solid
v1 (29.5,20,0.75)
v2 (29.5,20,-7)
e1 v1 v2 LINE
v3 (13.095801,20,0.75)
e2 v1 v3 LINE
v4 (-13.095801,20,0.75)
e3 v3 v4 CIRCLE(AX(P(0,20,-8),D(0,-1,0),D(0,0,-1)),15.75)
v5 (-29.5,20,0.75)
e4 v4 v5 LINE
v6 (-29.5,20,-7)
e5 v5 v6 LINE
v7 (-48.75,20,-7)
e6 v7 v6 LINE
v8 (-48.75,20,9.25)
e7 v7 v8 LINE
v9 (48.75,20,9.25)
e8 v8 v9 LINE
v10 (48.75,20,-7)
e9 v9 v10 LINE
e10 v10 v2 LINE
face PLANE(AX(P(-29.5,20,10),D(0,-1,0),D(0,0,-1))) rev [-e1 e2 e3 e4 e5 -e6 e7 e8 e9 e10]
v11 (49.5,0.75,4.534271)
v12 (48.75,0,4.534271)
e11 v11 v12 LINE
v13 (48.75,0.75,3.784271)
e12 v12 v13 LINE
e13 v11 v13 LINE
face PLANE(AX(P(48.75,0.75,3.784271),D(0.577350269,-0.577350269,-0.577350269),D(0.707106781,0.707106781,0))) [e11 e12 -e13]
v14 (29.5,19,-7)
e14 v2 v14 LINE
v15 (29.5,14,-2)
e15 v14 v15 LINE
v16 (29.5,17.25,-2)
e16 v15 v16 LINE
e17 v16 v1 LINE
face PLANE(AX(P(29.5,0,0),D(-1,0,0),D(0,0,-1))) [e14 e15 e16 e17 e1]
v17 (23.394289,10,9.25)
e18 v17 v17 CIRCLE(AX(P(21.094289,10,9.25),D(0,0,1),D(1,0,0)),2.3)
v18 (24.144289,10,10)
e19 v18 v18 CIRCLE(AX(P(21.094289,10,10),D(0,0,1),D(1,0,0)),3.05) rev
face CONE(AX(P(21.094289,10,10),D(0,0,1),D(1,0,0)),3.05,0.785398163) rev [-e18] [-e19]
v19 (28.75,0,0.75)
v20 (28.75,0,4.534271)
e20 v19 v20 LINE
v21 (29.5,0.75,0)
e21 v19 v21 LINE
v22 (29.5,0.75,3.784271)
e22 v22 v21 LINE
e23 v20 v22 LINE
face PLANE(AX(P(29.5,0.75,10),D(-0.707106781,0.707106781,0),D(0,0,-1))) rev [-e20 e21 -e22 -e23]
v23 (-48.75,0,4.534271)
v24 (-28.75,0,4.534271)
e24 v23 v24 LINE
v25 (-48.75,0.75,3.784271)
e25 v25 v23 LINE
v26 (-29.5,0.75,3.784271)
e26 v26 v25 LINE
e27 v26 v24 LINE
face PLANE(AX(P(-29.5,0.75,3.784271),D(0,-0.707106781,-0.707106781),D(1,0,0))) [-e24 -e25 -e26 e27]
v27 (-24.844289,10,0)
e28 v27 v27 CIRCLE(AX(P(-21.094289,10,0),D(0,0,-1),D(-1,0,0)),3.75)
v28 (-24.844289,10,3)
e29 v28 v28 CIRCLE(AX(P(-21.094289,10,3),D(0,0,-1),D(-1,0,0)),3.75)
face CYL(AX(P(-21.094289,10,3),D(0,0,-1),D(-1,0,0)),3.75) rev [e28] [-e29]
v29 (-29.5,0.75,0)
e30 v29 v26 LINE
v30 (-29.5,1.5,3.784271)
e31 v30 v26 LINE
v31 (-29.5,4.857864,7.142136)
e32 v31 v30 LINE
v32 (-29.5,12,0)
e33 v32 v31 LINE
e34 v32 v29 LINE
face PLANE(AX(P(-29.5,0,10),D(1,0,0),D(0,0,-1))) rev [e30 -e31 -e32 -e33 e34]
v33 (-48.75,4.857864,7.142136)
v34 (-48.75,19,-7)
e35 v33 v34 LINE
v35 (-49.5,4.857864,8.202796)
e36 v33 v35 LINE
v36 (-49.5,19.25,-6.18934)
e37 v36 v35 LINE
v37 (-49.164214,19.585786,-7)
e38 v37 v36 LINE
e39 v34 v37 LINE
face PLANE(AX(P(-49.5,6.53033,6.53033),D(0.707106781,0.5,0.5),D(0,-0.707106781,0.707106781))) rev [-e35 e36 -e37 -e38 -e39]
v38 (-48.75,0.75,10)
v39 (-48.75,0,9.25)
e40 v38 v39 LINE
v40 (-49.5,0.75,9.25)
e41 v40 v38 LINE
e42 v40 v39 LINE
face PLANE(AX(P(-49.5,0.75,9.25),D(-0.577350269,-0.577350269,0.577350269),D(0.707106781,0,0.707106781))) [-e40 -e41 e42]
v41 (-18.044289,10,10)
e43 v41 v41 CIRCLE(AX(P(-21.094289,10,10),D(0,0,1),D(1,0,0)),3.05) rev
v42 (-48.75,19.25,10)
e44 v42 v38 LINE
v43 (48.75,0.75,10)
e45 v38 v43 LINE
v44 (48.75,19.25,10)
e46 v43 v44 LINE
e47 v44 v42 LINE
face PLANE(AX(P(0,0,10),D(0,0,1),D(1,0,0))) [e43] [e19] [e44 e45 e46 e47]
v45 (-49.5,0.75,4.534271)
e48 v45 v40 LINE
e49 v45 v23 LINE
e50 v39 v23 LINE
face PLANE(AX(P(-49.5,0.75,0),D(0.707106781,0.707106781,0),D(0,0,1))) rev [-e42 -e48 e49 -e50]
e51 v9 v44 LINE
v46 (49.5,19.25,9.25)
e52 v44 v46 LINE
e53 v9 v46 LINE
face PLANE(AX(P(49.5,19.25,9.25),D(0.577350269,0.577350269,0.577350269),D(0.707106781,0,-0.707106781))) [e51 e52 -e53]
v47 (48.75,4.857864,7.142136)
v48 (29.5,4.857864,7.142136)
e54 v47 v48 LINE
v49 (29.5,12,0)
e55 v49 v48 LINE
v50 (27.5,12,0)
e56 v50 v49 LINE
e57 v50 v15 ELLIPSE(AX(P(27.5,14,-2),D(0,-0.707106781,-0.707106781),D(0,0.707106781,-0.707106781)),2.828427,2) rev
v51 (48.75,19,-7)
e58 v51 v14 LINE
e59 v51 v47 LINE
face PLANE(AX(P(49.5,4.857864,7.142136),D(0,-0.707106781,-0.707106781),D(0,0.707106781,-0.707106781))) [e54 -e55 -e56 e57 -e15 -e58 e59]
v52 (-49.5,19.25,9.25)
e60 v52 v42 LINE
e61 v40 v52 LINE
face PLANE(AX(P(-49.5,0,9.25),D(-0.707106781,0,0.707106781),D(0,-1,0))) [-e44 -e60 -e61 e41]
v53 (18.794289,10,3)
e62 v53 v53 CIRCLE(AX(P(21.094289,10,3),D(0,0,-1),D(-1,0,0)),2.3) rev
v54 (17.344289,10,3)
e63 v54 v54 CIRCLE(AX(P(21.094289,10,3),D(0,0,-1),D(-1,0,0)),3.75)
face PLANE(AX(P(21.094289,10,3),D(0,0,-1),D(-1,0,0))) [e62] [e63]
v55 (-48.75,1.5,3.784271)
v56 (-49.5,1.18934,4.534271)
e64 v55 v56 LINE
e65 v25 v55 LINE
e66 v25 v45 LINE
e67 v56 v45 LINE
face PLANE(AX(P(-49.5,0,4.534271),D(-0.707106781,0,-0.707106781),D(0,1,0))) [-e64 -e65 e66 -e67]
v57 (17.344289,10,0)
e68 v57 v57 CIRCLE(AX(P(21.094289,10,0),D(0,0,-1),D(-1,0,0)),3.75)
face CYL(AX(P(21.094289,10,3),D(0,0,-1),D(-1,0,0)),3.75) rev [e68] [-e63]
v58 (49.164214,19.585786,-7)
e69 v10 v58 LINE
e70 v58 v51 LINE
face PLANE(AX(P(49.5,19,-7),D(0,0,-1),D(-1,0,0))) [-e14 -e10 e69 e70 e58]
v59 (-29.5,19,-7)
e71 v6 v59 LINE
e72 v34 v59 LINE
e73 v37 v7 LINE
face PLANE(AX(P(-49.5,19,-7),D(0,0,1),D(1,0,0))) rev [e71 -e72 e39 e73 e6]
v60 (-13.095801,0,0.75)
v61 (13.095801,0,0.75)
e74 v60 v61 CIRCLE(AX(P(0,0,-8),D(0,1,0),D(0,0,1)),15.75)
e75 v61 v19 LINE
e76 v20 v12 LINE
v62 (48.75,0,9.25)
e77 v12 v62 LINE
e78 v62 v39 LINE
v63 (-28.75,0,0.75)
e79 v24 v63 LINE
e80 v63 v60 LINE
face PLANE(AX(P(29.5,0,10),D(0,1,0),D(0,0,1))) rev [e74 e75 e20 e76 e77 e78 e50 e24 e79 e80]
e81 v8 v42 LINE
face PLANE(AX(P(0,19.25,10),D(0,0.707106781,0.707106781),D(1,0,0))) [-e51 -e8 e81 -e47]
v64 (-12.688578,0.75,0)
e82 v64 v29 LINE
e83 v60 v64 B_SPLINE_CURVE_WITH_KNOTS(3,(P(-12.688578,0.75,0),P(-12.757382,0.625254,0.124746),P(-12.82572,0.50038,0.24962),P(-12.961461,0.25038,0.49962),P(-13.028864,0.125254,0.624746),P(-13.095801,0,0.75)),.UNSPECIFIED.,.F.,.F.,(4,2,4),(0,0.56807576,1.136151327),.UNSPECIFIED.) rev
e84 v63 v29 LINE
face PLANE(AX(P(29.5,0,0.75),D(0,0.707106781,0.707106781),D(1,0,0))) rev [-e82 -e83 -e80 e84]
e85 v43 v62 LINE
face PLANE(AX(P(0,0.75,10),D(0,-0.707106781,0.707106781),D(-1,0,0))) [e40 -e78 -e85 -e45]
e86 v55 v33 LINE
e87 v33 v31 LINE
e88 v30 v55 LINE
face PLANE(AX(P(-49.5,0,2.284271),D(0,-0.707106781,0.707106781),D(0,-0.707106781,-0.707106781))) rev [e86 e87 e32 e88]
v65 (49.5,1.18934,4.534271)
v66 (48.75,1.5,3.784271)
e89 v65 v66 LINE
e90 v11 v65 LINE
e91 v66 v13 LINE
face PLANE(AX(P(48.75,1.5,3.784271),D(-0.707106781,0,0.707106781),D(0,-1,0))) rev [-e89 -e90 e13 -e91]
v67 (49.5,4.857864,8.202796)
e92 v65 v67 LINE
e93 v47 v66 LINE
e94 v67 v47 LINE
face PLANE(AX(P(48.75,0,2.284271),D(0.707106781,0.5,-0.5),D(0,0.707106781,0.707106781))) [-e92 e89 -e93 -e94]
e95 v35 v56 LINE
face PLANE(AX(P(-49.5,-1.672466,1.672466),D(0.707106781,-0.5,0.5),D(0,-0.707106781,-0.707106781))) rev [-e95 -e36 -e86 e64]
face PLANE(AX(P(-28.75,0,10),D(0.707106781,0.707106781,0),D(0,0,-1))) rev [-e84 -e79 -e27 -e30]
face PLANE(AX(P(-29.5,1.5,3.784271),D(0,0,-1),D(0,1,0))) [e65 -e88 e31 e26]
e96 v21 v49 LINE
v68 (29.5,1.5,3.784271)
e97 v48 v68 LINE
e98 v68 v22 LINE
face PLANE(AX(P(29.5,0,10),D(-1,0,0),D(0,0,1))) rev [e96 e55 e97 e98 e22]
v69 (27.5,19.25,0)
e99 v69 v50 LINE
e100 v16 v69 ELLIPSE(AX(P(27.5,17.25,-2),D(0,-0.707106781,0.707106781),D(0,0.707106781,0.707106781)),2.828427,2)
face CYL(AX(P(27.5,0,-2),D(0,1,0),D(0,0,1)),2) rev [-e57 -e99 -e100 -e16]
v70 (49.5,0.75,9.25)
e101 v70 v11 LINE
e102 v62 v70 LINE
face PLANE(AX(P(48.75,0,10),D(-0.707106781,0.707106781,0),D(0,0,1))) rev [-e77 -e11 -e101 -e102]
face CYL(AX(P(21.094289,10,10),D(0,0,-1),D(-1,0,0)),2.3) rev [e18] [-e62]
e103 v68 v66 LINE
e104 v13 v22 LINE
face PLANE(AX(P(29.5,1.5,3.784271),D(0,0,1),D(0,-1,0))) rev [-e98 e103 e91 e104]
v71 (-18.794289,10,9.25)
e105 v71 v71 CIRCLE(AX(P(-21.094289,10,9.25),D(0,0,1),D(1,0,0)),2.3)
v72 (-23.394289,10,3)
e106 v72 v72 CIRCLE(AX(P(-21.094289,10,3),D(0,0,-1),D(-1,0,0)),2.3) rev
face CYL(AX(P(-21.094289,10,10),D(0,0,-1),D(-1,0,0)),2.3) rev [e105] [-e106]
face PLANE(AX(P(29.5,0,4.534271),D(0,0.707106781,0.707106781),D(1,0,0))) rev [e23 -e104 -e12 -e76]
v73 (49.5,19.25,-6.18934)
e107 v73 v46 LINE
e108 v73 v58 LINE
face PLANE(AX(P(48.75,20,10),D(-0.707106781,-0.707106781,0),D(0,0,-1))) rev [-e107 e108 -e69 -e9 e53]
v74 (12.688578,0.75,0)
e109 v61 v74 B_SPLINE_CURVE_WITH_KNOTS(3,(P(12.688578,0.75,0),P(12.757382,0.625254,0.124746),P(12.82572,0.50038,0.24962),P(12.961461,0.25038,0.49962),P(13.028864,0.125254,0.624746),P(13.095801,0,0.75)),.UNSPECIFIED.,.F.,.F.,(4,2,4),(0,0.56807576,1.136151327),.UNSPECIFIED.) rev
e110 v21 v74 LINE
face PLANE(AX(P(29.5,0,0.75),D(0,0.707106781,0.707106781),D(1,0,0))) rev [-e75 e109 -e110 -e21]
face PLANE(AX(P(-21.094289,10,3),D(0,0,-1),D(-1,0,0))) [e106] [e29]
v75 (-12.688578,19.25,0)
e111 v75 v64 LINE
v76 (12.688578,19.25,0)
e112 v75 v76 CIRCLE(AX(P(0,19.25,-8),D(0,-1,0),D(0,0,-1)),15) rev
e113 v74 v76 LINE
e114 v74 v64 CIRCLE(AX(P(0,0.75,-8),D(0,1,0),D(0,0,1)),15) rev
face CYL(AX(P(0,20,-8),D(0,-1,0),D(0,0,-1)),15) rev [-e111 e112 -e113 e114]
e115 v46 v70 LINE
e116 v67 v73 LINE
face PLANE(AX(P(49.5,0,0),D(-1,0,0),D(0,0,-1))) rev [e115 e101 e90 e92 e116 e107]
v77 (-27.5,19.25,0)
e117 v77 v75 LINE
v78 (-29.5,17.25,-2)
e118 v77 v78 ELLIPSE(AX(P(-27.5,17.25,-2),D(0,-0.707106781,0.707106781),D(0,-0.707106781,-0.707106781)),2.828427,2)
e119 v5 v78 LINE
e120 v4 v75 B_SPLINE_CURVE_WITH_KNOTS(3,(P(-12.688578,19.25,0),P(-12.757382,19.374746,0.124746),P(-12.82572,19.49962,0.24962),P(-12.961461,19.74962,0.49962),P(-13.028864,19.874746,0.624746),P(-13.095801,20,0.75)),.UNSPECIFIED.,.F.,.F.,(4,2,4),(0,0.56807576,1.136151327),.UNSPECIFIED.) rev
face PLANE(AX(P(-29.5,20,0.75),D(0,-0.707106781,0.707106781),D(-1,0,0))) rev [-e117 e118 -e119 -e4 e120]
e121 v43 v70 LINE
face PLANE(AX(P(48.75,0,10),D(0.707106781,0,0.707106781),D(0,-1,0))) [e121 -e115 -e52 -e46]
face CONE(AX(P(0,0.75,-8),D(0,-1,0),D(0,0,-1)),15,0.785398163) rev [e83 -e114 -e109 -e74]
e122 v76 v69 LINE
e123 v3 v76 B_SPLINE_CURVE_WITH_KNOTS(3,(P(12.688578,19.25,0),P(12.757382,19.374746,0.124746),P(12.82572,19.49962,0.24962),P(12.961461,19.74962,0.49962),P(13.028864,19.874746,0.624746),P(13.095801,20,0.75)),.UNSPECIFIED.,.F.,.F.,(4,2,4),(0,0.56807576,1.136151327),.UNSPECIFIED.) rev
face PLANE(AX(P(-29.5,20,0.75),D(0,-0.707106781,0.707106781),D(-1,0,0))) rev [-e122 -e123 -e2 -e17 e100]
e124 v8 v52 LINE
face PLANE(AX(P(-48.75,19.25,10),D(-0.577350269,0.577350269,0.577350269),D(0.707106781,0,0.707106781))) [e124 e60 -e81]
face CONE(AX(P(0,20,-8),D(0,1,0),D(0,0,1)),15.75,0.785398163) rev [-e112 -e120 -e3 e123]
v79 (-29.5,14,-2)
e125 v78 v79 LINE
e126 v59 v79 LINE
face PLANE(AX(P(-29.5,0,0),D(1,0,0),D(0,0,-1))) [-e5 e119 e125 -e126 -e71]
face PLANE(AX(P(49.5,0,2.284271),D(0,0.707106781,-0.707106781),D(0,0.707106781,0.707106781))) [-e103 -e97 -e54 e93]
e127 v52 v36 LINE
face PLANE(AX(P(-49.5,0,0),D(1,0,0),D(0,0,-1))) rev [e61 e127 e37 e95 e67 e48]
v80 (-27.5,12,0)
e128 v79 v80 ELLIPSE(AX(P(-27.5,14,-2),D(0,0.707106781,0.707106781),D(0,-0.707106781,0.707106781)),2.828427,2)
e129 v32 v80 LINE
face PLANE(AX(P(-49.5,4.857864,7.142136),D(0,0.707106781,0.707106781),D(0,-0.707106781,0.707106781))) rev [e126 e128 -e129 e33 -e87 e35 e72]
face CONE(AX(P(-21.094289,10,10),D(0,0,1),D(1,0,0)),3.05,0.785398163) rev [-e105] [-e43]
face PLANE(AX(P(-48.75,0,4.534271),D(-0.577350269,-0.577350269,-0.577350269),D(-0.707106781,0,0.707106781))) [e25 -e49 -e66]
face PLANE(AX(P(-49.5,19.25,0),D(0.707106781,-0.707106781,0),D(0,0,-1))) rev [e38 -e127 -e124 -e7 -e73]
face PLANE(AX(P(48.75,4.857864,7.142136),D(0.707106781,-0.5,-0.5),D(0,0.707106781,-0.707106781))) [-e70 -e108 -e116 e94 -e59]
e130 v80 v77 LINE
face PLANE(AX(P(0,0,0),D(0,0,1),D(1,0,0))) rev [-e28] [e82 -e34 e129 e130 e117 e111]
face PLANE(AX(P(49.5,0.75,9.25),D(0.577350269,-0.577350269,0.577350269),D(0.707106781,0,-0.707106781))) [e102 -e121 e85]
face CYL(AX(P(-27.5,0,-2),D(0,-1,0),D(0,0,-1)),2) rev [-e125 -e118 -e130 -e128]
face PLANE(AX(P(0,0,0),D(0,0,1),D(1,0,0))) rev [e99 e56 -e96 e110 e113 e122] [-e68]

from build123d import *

# Parameters (mm, degrees)
SKIZZE1_W                       = 59
SKIZZE1_H                       = 20
AUFSATZ_LINEAR_AUSTRAGEN1_DEPTH = 10
AUFSATZ_LINEAR_AUSTRAGEN2_DEPTH = 20
SKIZZE3_R                       = 15
SCHNITT_LINEAR_AUSTRAGEN1_DEPTH = 20
SKIZZE4_R                       = 2.3
SCHNITT_LINEAR_AUSTRAGEN2_DEPTH = 10
SKIZZE5_R                       = 3.75
SCHNITT_LINEAR_AUSTRAGEN3_DEPTH = 3
SCHNITT_LINEAR_AUSTRAGEN4_DEPTH = 20
VERRUNDUNG1_R                   = 2


with BuildPart() as part:
    # Skizze1 → Aufsatz-Linear austragen1 (new body)
    with BuildSketch(Plane.XY):
        with Locations((0, 10)):
            Rectangle(SKIZZE1_W, SKIZZE1_H)
    extrude(amount=AUFSATZ_LINEAR_AUSTRAGEN1_DEPTH)

    # Skizze2 → Aufsatz-Linear austragen2 (add)
    with BuildSketch(Plane.ZY.offset(29.5)):
        Polygon((7.142135624, 4.857864376), (-7, 19), (-7, 20), (0, 20), (10, 20), (10, 0), (2.284271247, 0), align=None)
    aufsatz_linear_austragen2 = extrude(amount=AUFSATZ_LINEAR_AUSTRAGEN2_DEPTH)

    # Spiegeln1: Aufsatz-Linear austragen2 across plane
    add(aufsatz_linear_austragen2.mirror(Plane(origin=(0, 0, 0), x_dir=(0, 0, 1), z_dir=(1, 0, 0))))

    # Skizze3 → Schnitt-Linear austragen1 (cut)
    with BuildSketch(Plane.XZ):
        with Locations((0, -8)):
            Circle(SKIZZE3_R)
    extrude(amount=-SCHNITT_LINEAR_AUSTRAGEN1_DEPTH, mode=Mode.SUBTRACT)

    # Skizze4 → Schnitt-Linear austragen2 (cut)
    with BuildSketch(Plane(origin=(0, 0, 0), x_dir=(-1, 0, 0), z_dir=(0, 0, -1))):
        with Locations((-21.09428877, 10)):
            Circle(SKIZZE4_R)
        with Locations(Location((21.09428877, 10, 0), (0, 0, 180))):
            Circle(SKIZZE4_R)
    extrude(amount=-SCHNITT_LINEAR_AUSTRAGEN2_DEPTH, mode=Mode.SUBTRACT)

    # Skizze5 → Schnitt-Linear austragen3 (cut)
    with BuildSketch(Plane(origin=(0, 0, 0), x_dir=(-1, 0, 0), z_dir=(0, 0, -1))):
        with Locations((-21.09428877, 10)):
            Circle(SKIZZE5_R)
        with Locations((21.09428877, 10)):
            Circle(SKIZZE5_R)
    extrude(amount=-SCHNITT_LINEAR_AUSTRAGEN3_DEPTH, mode=Mode.SUBTRACT)

    # Skizze6 → Schnitt-Linear austragen4 (cut)
    with BuildSketch(Plane(origin=(49.5, 0, 0), x_dir=(0, 0, -1), z_dir=(1, 0, 0))):
        Polygon((-3.784271247, 1.5), (-3.784271247, 0), (-1.831080062, -0.949282867), (-1.396270995, 1.527811212), align=None)
    schnitt_linear_austragen4 = extrude(amount=-SCHNITT_LINEAR_AUSTRAGEN4_DEPTH, mode=Mode.SUBTRACT)

    # Spiegeln2: Schnitt-Linear austragen4 across plane
    add(schnitt_linear_austragen4.mirror(Plane(origin=(0, 0, 0), x_dir=(0, 0, 1), z_dir=(1, 0, 0))), mode=Mode.SUBTRACT)

    # Fase1
    # the kernel refuses this chamfer: 0.75 mm, written as the material it takes off along each edge
    with BuildSketch(Plane(origin=(49, 19.5, 9.5), x_dir=(-0.7071067811865492, 0.7071067811865459, 0), z_dir=(0.5773502691896248, 0.5773502691896276, 0.5773502691896248)), Plane(origin=(-49, 19.5, 9.5), x_dir=(-0.7071067811865492, -0.7071067811865459, 0), z_dir=(-0.5773502691896248, 0.5773502691896276, 0.5773502691896248))) as fase1_piece_1:
        Polygon((-0.530330086, -0.306186218), (0.530330086, -0.306186218), (0, 0.612372436), align=None)
    extrude(amount=0.952627944, mode=Mode.SUBTRACT)
    with BuildSketch(Plane(origin=(49, 0.5, 4.284271247), x_dir=(-0.7071067811865476, -1.4654196281048569e-15, -0.7071067811865476), z_dir=(0.5773502691896273, -0.5773502691896242, -0.577350269189626)), Plane(origin=(-49, 0.5, 9.5), x_dir=(-0.7071067811865458, 0.7071067811865491, 0), z_dir=(-0.5773502691896266, -0.577350269189624, 0.5773502691896268)), Plane(origin=(-49, 0.5, 4.284271247), x_dir=(0, 0.7071067811865487, -0.7071067811865464), z_dir=(-0.577350269189627, -0.5773502691896243, -0.5773502691896261)), Plane(origin=(49, 0.5, 9.5), x_dir=(-0.7071067811865457, -0.7071067811865492, 0), z_dir=(0.5773502691896267, -0.5773502691896237, 0.5773502691896267))) as fase1_piece_2:
        Polygon((-0.530330086, 0.306186218), (0.530330086, 0.306186218), (0, -0.612372436), align=None)
    extrude(amount=0.952627944, mode=Mode.SUBTRACT)
    with BuildSketch(Plane(origin=(-21.09428877, 10, 10), x_dir=(1, 0, 0), z_dir=(0, 1, 0))) as fase1_piece_3:
        with BuildLine():
            Line((2.278786797, 0.771213203), (3.071213203, -0.021213203))
            Line((3.071213203, -0.021213203), (3.071213203, -0.036213203))
            ThreePointArc((3.071213203, -0.036213203), (2.685606602, -0.015), (2.3, -0.015))
            Line((2.3, -0.015), (2.285, 0))
            ThreePointArc((2.285, 0), (2.285, 0.385606602), (2.263786797, 0.771213203))
            Line((2.263786797, 0.771213203), (2.278786797, 0.771213203))
        make_face()
    revolve(axis=Axis((-21.09428877, 10, 10), (0, 0, -1)), mode=Mode.SUBTRACT)
    with BuildSketch(Plane(origin=(21.09428877, 10, 10), x_dir=(-1, 0, 0), z_dir=(0, -1, 0))) as fase1_piece_4:
        with BuildLine():
            Line((3.071213203, -0.021213203), (2.278786797, 0.771213203))
            Line((2.278786797, 0.771213203), (2.263786797, 0.771213203))
            ThreePointArc((2.263786797, 0.771213203), (2.285, 0.385606602), (2.285, 0))
            Line((2.285, 0), (2.3, -0.015))
            ThreePointArc((2.3, -0.015), (2.685606602, -0.015), (3.071213203, -0.036213203))
            Line((3.071213203, -0.036213203), (3.071213203, -0.021213203))
        make_face()
    revolve(axis=Axis((21.09428877, 10, 10), (0, 0, -1)), mode=Mode.SUBTRACT)
    with BuildSketch(Plane(origin=(49.5, 20, 0), x_dir=(-0.9996219169112969, 0.027495876610582292, 0), z_dir=(0, 0, 1))) as fase1_piece_5:
        with BuildLine():
            Line((0.771504896, 0), (-0.042410366, 0.770338345))
            Line((-0.042410366, 0.770338345), (-0.057404695, 0.769925907))
            ThreePointArc((-0.057404695, 0.769925907), (-0.02559692, 0.385048372), (-0.014994329, -0.000412438))
            Line((-0.014994329, -0.000412438), (0.000412438, -0.014994329))
            ThreePointArc((0.000412438, -0.014994329), (0.385873249, -0.004391737), (0.771917335, -0.014994329))
            Line((0.771917335, -0.014994329), (0.771504896, 0))
        make_face()
    extrude(amount=11.928762241, mode=Mode.SUBTRACT)
    with BuildSketch(Plane(origin=(49.5, 4.857864376, 7.142135624), x_dir=(-0.9996219169112968, -0.01944252080601377, -0.01944252080601398), z_dir=(0, 0.7071067811865513, -0.7071067811865438)), Plane(origin=(51.428762241, 0, 3.784271247), x_dir=(0, -0.027495876610586376, 0.9996219169112968), z_dir=(-1, 0, 0))) as fase1_piece_6:
        with BuildLine():
            Line((0.771504896, 0), (-0.042410366, 0.770338345))
            Line((-0.042410366, 0.770338345), (-0.057404695, 0.769925907))
            ThreePointArc((-0.057404695, 0.769925907), (-0.02559692, 0.385048372), (-0.014994329, -0.000412438))
            Line((-0.014994329, -0.000412438), (0.000412438, -0.014994329))
            ThreePointArc((0.000412438, -0.014994329), (0.385873249, -0.004391737), (0.771917335, -0.014994329))
            Line((0.771917335, -0.014994329), (0.771504896, 0))
        make_face()
    extrude(amount=21.928762241, mode=Mode.SUBTRACT)
    with BuildSketch(Plane(origin=(49.5, 0.13615914, 2.420430388), x_dir=(-0.9996219169112968, 0.01944252080601445, -0.019442520806014447), z_dir=(0, 0.7071067811865475, 0.7071067811865476))) as fase1_piece_7:
        with BuildLine():
            Line((0.771504896, 0), (-0.042410366, 0.770338345))
            Line((-0.042410366, 0.770338345), (-0.057404695, 0.769925907))
            ThreePointArc((-0.057404695, 0.769925907), (-0.02559692, 0.385048372), (-0.014994329, -0.000412438))
            Line((-0.014994329, -0.000412438), (0.000412438, -0.014994329))
            ThreePointArc((0.000412438, -0.014994329), (0.385873249, -0.004391737), (0.771917335, -0.014994329))
            Line((0.771917335, -0.014994329), (0.771504896, 0))
        make_face()
    extrude(amount=6.677499583, mode=Mode.SUBTRACT)
    with BuildSketch(Plane(origin=(49.5, 3.428762241, 3.784271247), x_dir=(0.027495876610582164, 0, 0.9996219169112969), z_dir=(0, -1, 0)), Plane(origin=(-49.5, 3.428762241, 3.784271247), x_dir=(0.9996219169112968, 0, -0.027495876610586317), z_dir=(0, -1, 0))) as fase1_piece_8:
        with BuildLine():
            Line((0.771504896, 0), (-0.042410366, 0.770338345))
            Line((-0.042410366, 0.770338345), (-0.057404695, 0.769925907))
            ThreePointArc((-0.057404695, 0.769925907), (-0.02559692, 0.385048372), (-0.014994329, -0.000412438))
            Line((-0.014994329, -0.000412438), (0.000412438, -0.014994329))
            ThreePointArc((0.000412438, -0.014994329), (0.385873249, -0.004391737), (0.771917335, -0.014994329))
            Line((0.771917335, -0.014994329), (0.771504896, 0))
        make_face()
    extrude(amount=5.357524482, mode=Mode.SUBTRACT)
    with BuildSketch(Plane(origin=(-49.5, 0, 11.928762241), x_dir=(0.9996219169112968, -0.027495876610586487, 0), z_dir=(0, 0, -1))) as fase1_piece_9:
        with BuildLine():
            Line((0.771504896, 0), (-0.042410366, -0.770338345))
            Line((-0.042410366, -0.770338345), (-0.057404695, -0.769925907))
            ThreePointArc((-0.057404695, -0.769925907), (-0.02559692, -0.385048372), (-0.014994329, 0.000412438))
            Line((-0.014994329, 0.000412438), (0.000412438, 0.014994329))
            ThreePointArc((0.000412438, 0.014994329), (0.385873249, 0.004391737), (0.771917335, 0.014994329))
            Line((0.771917335, 0.014994329), (0.771504896, 0))
        make_face()
    extrude(amount=10.073253234, mode=Mode.SUBTRACT)
    with BuildSketch(Plane(origin=(49.5, 21.928762241, 10), x_dir=(-0.9996219169112968, 0, 0.027495876610586893), z_dir=(0, -1, 0)), Plane(origin=(-49.5, 21.928762241, 10), x_dir=(-0.027495876610582164, 0, -0.9996219169112969), z_dir=(0, -1, 0))) as fase1_piece_10:
        with BuildLine():
            Line((0.771504896, 0), (-0.042410366, 0.770338345))
            Line((-0.042410366, 0.770338345), (-0.057404695, 0.769925907))
            ThreePointArc((-0.057404695, 0.769925907), (-0.02559692, 0.385048372), (-0.014994329, -0.000412438))
            Line((-0.014994329, -0.000412438), (0.000412438, -0.014994329))
            ThreePointArc((0.000412438, -0.014994329), (0.385873249, -0.004391737), (0.771917335, -0.014994329))
            Line((0.771917335, -0.014994329), (0.771504896, 0))
        make_face()
    extrude(amount=23.857524482, mode=Mode.SUBTRACT)
    with BuildSketch(Plane(origin=(51.428762241, 20, 10), x_dir=(0, 0.027495876610586768, -0.9996219169112968), z_dir=(-1, 0, 0))) as fase1_piece_11:
        with BuildLine():
            Line((0.771504896, 0), (-0.042410366, 0.770338345))
            Line((-0.042410366, 0.770338345), (-0.057404695, 0.769925907))
            ThreePointArc((-0.057404695, 0.769925907), (-0.02559692, 0.385048372), (-0.014994329, -0.000412438))
            Line((-0.014994329, -0.000412438), (0.000412438, -0.014994329))
            ThreePointArc((0.000412438, -0.014994329), (0.385873249, -0.004391737), (0.771917335, -0.014994329))
            Line((0.771917335, -0.014994329), (0.771504896, 0))
        make_face()
    extrude(amount=102.857524482, mode=Mode.SUBTRACT)
    with BuildSketch(Plane(origin=(51.428762241, 0, 10), x_dir=(0, -0.02749587661058636, -0.9996219169112968), z_dir=(-1, 0, 0))) as fase1_piece_12:
        with BuildLine():
            Line((0.771504896, 0), (-0.042410366, -0.770338345))
            Line((-0.042410366, -0.770338345), (-0.057404695, -0.769925907))
            ThreePointArc((-0.057404695, -0.769925907), (-0.02559692, -0.385048372), (-0.014994329, 0.000412438))
            Line((-0.014994329, 0.000412438), (0.000412438, 0.014994329))
            ThreePointArc((0.000412438, 0.014994329), (0.385873249, 0.004391737), (0.771917335, 0.014994329))
            Line((0.771917335, 0.014994329), (0.771504896, 0))
        make_face()
    extrude(amount=102.857524482, mode=Mode.SUBTRACT)
    with BuildSketch(Plane(origin=(49.5, 0, 11.928762241), x_dir=(-0.9996219169112968, -0.027495876610586487, 0), z_dir=(0, 0, -1))) as fase1_piece_13:
        with BuildLine():
            Line((0.771504896, 0), (-0.042410366, 0.770338345))
            Line((-0.042410366, 0.770338345), (-0.057404695, 0.769925907))
            ThreePointArc((-0.057404695, 0.769925907), (-0.02559692, 0.385048372), (-0.014994329, -0.000412438))
            Line((-0.014994329, -0.000412438), (0.000412438, -0.014994329))
            ThreePointArc((0.000412438, -0.014994329), (0.385873249, -0.004391737), (0.771917335, -0.014994329))
            Line((0.771917335, -0.014994329), (0.771504896, 0))
        make_face()
    extrude(amount=10.073253234, mode=Mode.SUBTRACT)
    with BuildSketch(Plane(origin=(29.5, 0, -1.928762241), x_dir=(-0.9996219169112968, -0.02749587661058636, 0), z_dir=(0, 0, 1)), Plane(origin=(-29.5, 0, 3.784271247), x_dir=(0.9996219169112965, -0.027495876610589942, 0), z_dir=(0, 0, -1))) as fase1_piece_14:
        with BuildLine():
            Line((0.771504896, 0), (-0.042410366, -0.770338345))
            Line((-0.042410366, -0.770338345), (-0.057404695, -0.769925907))
            ThreePointArc((-0.057404695, -0.769925907), (-0.02559692, -0.385048372), (-0.014994329, 0.000412438))
            Line((-0.014994329, 0.000412438), (0.000412438, 0.014994329))
            ThreePointArc((0.000412438, 0.014994329), (0.385873249, 0.004391737), (0.771917335, 0.014994329))
            Line((0.771917335, 0.014994329), (0.771504896, 0))
        make_face()
    extrude(amount=5.713033488, mode=Mode.SUBTRACT)
    with BuildSketch(Plane(origin=(31.428762241, 0, 0), x_dir=(0, -0.027495876610586372, 0.9996219169112968), z_dir=(-1, 0, 0)), Plane(origin=(-10.759815299, 0, 0), x_dir=(0, -0.027495876610586372, 0.9996219169112968), z_dir=(-1, 0, 0))) as fase1_piece_15:
        with BuildLine():
            Line((0.771504896, 0), (-0.042410366, 0.770338345))
            Line((-0.042410366, 0.770338345), (-0.057404695, 0.769925907))
            ThreePointArc((-0.057404695, 0.769925907), (-0.02559692, 0.385048372), (-0.014994329, -0.000412438))
            Line((-0.014994329, -0.000412438), (0.000412438, -0.014994329))
            ThreePointArc((0.000412438, -0.014994329), (0.385873249, -0.004391737), (0.771917335, -0.014994329))
            Line((0.771917335, -0.014994329), (0.771504896, 0))
        make_face()
    extrude(amount=20.668946941, mode=Mode.SUBTRACT)
    with BuildSketch(Plane(origin=(0, 0, -8), x_dir=(0.9073469377071578, 0, 0.42038260505573166), z_dir=(0.42038260505573166, 0, -0.9073469377071578))) as fase1_piece_16:
        with BuildLine():
            Line((15.771213203, 0.021213203), (14.978786797, -0.771213203))
            Line((14.978786797, -0.771213203), (14.963786797, -0.771213203))
            ThreePointArc((14.963786797, -0.771213203), (14.985, -0.385606602), (14.985, 0))
            Line((14.985, 0), (15, 0.015))
            ThreePointArc((15, 0.015), (15.385606602, 0.015), (15.771213203, 0.036213203))
            Line((15.771213203, 0.036213203), (15.771213203, 0.021213203))
        make_face()
    revolve(axis=Axis((0, 0, -8), (0, -1, 0)), revolution_arc=130.282509401, mode=Mode.SUBTRACT)
    with BuildSketch(Plane(origin=(-51.428762241, 0, 3.784271247), x_dir=(0, -0.027495876610586376, 0.9996219169112968), z_dir=(1, 0, 0)), Plane(origin=(-49.5, 4.857864376, 7.142135624), x_dir=(0.9996219169112968, -0.01944252080601377, -0.01944252080601398), z_dir=(0, 0.7071067811865513, -0.7071067811865438))) as fase1_piece_17:
        with BuildLine():
            Line((0.771504896, 0), (-0.042410366, -0.770338345))
            Line((-0.042410366, -0.770338345), (-0.057404695, -0.769925907))
            ThreePointArc((-0.057404695, -0.769925907), (-0.02559692, -0.385048372), (-0.014994329, 0.000412438))
            Line((-0.014994329, 0.000412438), (0.000412438, 0.014994329))
            ThreePointArc((0.000412438, 0.014994329), (0.385873249, 0.004391737), (0.771917335, 0.014994329))
            Line((0.771917335, 0.014994329), (0.771504896, 0))
        make_face()
    extrude(amount=21.928762241, mode=Mode.SUBTRACT)
    with BuildSketch(Plane(origin=(-49.5, 0.13615914, 2.420430388), x_dir=(0.9996219169112968, 0.01944252080601436, -0.019442520806014357), z_dir=(0, 0.7071067811865475, 0.7071067811865476))) as fase1_piece_18:
        with BuildLine():
            Line((0.771504896, 0), (-0.042410366, -0.770338345))
            Line((-0.042410366, -0.770338345), (-0.057404695, -0.769925907))
            ThreePointArc((-0.057404695, -0.769925907), (-0.02559692, -0.385048372), (-0.014994329, 0.000412438))
            Line((-0.014994329, 0.000412438), (0.000412438, 0.014994329))
            ThreePointArc((0.000412438, 0.014994329), (0.385873249, 0.004391737), (0.771917335, 0.014994329))
            Line((0.771917335, 0.014994329), (0.771504896, 0))
        make_face()
    extrude(amount=6.677499583, mode=Mode.SUBTRACT)
    with BuildSketch(Plane(origin=(-29.5, 20, 0), x_dir=(0, 0.027495876610586778, 0.9996219169112968), z_dir=(1, 0, 0)), Plane(origin=(10.759815299, 20, 0), x_dir=(0, 0.027495876610586778, 0.9996219169112968), z_dir=(1, 0, 0))) as fase1_piece_19:
        with BuildLine():
            Line((0.771504896, 0), (-0.042410366, 0.770338345))
            Line((-0.042410366, 0.770338345), (-0.057404695, 0.769925907))
            ThreePointArc((-0.057404695, 0.769925907), (-0.02559692, 0.385048372), (-0.014994329, -0.000412438))
            Line((-0.014994329, -0.000412438), (0.000412438, -0.014994329))
            ThreePointArc((0.000412438, -0.014994329), (0.385873249, -0.004391737), (0.771917335, -0.014994329))
            Line((0.771917335, -0.014994329), (0.771504896, 0))
        make_face()
    extrude(amount=18.740184701, mode=Mode.SUBTRACT)
    with BuildSketch(Plane(origin=(0, 20, -8), x_dir=(0.9073469377071578, 0, 0.42038260505573166), z_dir=(0.42038260505573166, 0, -0.9073469377071578))) as fase1_piece_20:
        with BuildLine():
            Line((14.978786797, 0.771213203), (15.771213203, -0.021213203))
            Line((15.771213203, -0.021213203), (15.771213203, -0.036213203))
            ThreePointArc((15.771213203, -0.036213203), (15.385606602, -0.015), (15, -0.015))
            Line((15, -0.015), (14.985, 0))
            ThreePointArc((14.985, 0), (14.985, 0.385606602), (14.963786797, 0.771213203))
            Line((14.963786797, 0.771213203), (14.978786797, 0.771213203))
        make_face()
    revolve(axis=Axis((0, 20, -8), (0, -1, 0)), revolution_arc=130.282509401, mode=Mode.SUBTRACT)
    with BuildSketch(Plane(origin=(-49.5, 20, 0), x_dir=(0.9996219169112969, 0.027495876610582292, 0), z_dir=(0, 0, 1))) as fase1_piece_21:
        with BuildLine():
            Line((0.771504896, 0), (-0.042410366, -0.770338345))
            Line((-0.042410366, -0.770338345), (-0.057404695, -0.769925907))
            ThreePointArc((-0.057404695, -0.769925907), (-0.02559692, -0.385048372), (-0.014994329, 0.000412438))
            Line((-0.014994329, 0.000412438), (0.000412438, 0.014994329))
            ThreePointArc((0.000412438, 0.014994329), (0.385873249, 0.004391737), (0.771917335, 0.014994329))
            Line((0.771917335, 0.014994329), (0.771504896, 0))
        make_face()
    extrude(amount=11.928762241, mode=Mode.SUBTRACT)
    with BuildSketch(Plane(origin=(-49.5, 20, -8.928762241), x_dir=(0.9996219169112968, 0.027495876610586893, -2.912407812628222e-14), z_dir=(0, 1.059216206806384e-12, 1.0))) as fase1_piece_22:
        with BuildLine():
            Line((0.771504896, 0), (-0.042410366, -0.770338345))
            Line((-0.042410366, -0.770338345), (-0.057404695, -0.769925907))
            ThreePointArc((-0.057404695, -0.769925907), (-0.02559692, -0.385048372), (-0.014994329, 0.000412438))
            Line((-0.014994329, 0.000412438), (0.000412438, 0.014994329))
            ThreePointArc((0.000412438, 0.014994329), (0.385873249, 0.004391737), (0.771917335, 0.014994329))
            Line((0.771917335, 0.014994329), (0.771504896, 0))
        make_face()
    extrude(amount=8.928762241, mode=Mode.SUBTRACT)
    with BuildSketch(Plane(origin=(49.5, 20, -8.928762241), x_dir=(-0.9996219169112968, 0.027495876610586893, -2.912407812628222e-14), z_dir=(0, 1.059216206806384e-12, 1.0))) as fase1_piece_23:
        with BuildLine():
            Line((0.771504896, 0), (-0.042410366, 0.770338345))
            Line((-0.042410366, 0.770338345), (-0.057404695, 0.769925907))
            ThreePointArc((-0.057404695, 0.769925907), (-0.02559692, 0.385048372), (-0.014994329, -0.000412438))
            Line((-0.014994329, -0.000412438), (0.000412438, -0.014994329))
            ThreePointArc((0.000412438, -0.014994329), (0.385873249, -0.004391737), (0.771917335, -0.014994329))
            Line((0.771917335, -0.014994329), (0.771504896, 0))
        make_face()
    extrude(amount=8.928762241, mode=Mode.SUBTRACT)
    with BuildSketch(Plane(origin=(49.5, 3.494023516, 8.505976484), x_dir=(-0.9996219169112968, -0.01944252080601521, -0.019442520806015415), z_dir=(0, 0.7071067811865513, -0.7071067811865438))) as fase1_piece_24a_section:
        with BuildLine():
            Line((0.771504896, 0), (-0.042410366, 0.770338345))
            Line((-0.042410366, 0.770338345), (-0.057404695, 0.769925907))
            ThreePointArc((-0.057404695, 0.769925907), (-0.02559692, 0.385048372), (-0.014994329, -0.000412438))
            Line((-0.014994329, -0.000412438), (0.000412438, -0.014994329))
            ThreePointArc((0.000412438, -0.014994329), (0.385873249, -0.004391737), (0.771917335, -0.014994329))
            Line((0.771917335, -0.014994329), (0.771504896, 0))
        make_face()
    fase1_piece_24a = extrude(amount=23.857524482, mode=Mode.PRIVATE)
    fase1_piece_24a = split(fase1_piece_24a, bisect_by=Plane(origin=(49.25265478, 5.032763859, 7.317035106), z_dir=(0, -0.7071067811865476, 0.7071067811865475)), keep=Keep.TOP, mode=Mode.PRIVATE)
    with BuildSketch(Plane(origin=(49.5, 0.13615914, 2.420430388), x_dir=(-0.9996219169112968, 0.01944252080601445, -0.019442520806014447), z_dir=(0, 0.7071067811865475, 0.7071067811865476))) as fase1_piece_24b_section:
        with BuildLine():
            Line((0.771504896, 0), (-0.042410366, 0.770338345))
            Line((-0.042410366, 0.770338345), (-0.057404695, 0.769925907))
            ThreePointArc((-0.057404695, 0.769925907), (-0.02559692, 0.385048372), (-0.014994329, -0.000412438))
            Line((-0.014994329, -0.000412438), (0.000412438, -0.014994329))
            ThreePointArc((0.000412438, -0.014994329), (0.385873249, -0.004391737), (0.771917335, -0.014994329))
            Line((0.771917335, -0.014994329), (0.771504896, 0))
        make_face()
    fase1_piece_24b = extrude(amount=8.606261823, mode=Mode.PRIVATE)
    fase1_piece_24b = split(fase1_piece_24b, bisect_by=Plane(origin=(49.25265478, 4.682964894, 7.317035106), z_dir=(0, 0.7071067811865438, 0.7071067811865513)), keep=Keep.TOP, mode=Mode.PRIVATE)
    fase1_piece_24 = fase1_piece_24a & fase1_piece_24b
    add(fase1_piece_24, mode=Mode.SUBTRACT)
    with BuildSketch(Plane(origin=(29.5, 0, -1.928762241), x_dir=(-0.9996219169112968, -0.02749587661058636, 0), z_dir=(0, 0, 1))) as fase1_piece_25a_section:
        with BuildLine():
            Line((0.771504896, 0), (-0.042410366, -0.770338345))
            Line((-0.042410366, -0.770338345), (-0.057404695, -0.769925907))
            ThreePointArc((-0.057404695, -0.769925907), (-0.02559692, -0.385048372), (-0.014994329, 0.000412438))
            Line((-0.014994329, 0.000412438), (0.000412438, 0.014994329))
            ThreePointArc((0.000412438, 0.014994329), (0.385873249, 0.004391737), (0.771917335, 0.014994329))
            Line((0.771917335, 0.014994329), (0.771504896, 0))
        make_face()
    fase1_piece_25a = extrude(amount=7.641795729, mode=Mode.PRIVATE)
    fase1_piece_25a = split(fase1_piece_25a, bisect_by=Plane(origin=(29.25265478, 0.24734522, 3.784271247), z_dir=(0, 0, 1)), keep=Keep.TOP, mode=Mode.PRIVATE)
    with BuildSketch(Plane(origin=(51.428762241, 0, 3.784271247), x_dir=(0, -0.027495876610586376, 0.9996219169112968), z_dir=(-1, 0, 0))) as fase1_piece_25b_section:
        with BuildLine():
            Line((0.771504896, 0), (-0.042410366, 0.770338345))
            Line((-0.042410366, 0.770338345), (-0.057404695, 0.769925907))
            ThreePointArc((-0.057404695, 0.769925907), (-0.02559692, 0.385048372), (-0.014994329, -0.000412438))
            Line((-0.014994329, -0.000412438), (0.000412438, -0.014994329))
            ThreePointArc((0.000412438, -0.014994329), (0.385873249, -0.004391737), (0.771917335, -0.014994329))
            Line((0.771917335, -0.014994329), (0.771504896, 0))
        make_face()
    fase1_piece_25b = extrude(amount=23.857524482, mode=Mode.PRIVATE)
    fase1_piece_25b = split(fase1_piece_25b, bisect_by=Plane(origin=(29.5, 0.24734522, 4.031616468), z_dir=(-1, 0, 0)), keep=Keep.TOP, mode=Mode.PRIVATE)
    fase1_piece_25 = fase1_piece_25a & fase1_piece_25b
    add(fase1_piece_25, mode=Mode.SUBTRACT)
    with BuildSketch(Plane(origin=(-51.428762241, 0, 3.784271247), x_dir=(0, -0.027495876610586376, 0.9996219169112968), z_dir=(1, 0, 0))) as fase1_piece_26a_section:
        with BuildLine():
            Line((0.771504896, 0), (-0.042410366, -0.770338345))
            Line((-0.042410366, -0.770338345), (-0.057404695, -0.769925907))
            ThreePointArc((-0.057404695, -0.769925907), (-0.02559692, -0.385048372), (-0.014994329, 0.000412438))
            Line((-0.014994329, 0.000412438), (0.000412438, 0.014994329))
            ThreePointArc((0.000412438, 0.014994329), (0.385873249, 0.004391737), (0.771917335, 0.014994329))
            Line((0.771917335, 0.014994329), (0.771504896, 0))
        make_face()
    fase1_piece_26a = extrude(amount=23.857524482, mode=Mode.PRIVATE)
    fase1_piece_26a = split(fase1_piece_26a, bisect_by=Plane(origin=(-29.5, 0.24734522, 4.031616468), z_dir=(1, 0, 0)), keep=Keep.TOP, mode=Mode.PRIVATE)
    with BuildSketch(Plane(origin=(-29.5, 0, 5.713033488), x_dir=(0.9996219169112968, -0.02749587661058636, 0), z_dir=(0, 0, -1))) as fase1_piece_26b_section:
        with BuildLine():
            Line((0.771504896, 0), (-0.042410366, -0.770338345))
            Line((-0.042410366, -0.770338345), (-0.057404695, -0.769925907))
            ThreePointArc((-0.057404695, -0.769925907), (-0.02559692, -0.385048372), (-0.014994329, 0.000412438))
            Line((-0.014994329, 0.000412438), (0.000412438, 0.014994329))
            ThreePointArc((0.000412438, 0.014994329), (0.385873249, 0.004391737), (0.771917335, 0.014994329))
            Line((0.771917335, 0.014994329), (0.771504896, 0))
        make_face()
    fase1_piece_26b = extrude(amount=7.641795729, mode=Mode.PRIVATE)
    fase1_piece_26b = split(fase1_piece_26b, bisect_by=Plane(origin=(-29.25265478, 0.24734522, 3.784271247), z_dir=(0, 0, 1)), keep=Keep.TOP, mode=Mode.PRIVATE)
    fase1_piece_26 = fase1_piece_26a & fase1_piece_26b
    add(fase1_piece_26, mode=Mode.SUBTRACT)
    with BuildSketch(Plane(origin=(-49.5, 3.494023516, 8.505976484), x_dir=(0.9996219169112968, -0.019442520806014923, -0.019442520806015127), z_dir=(0, 0.7071067811865513, -0.7071067811865438))) as fase1_piece_27a_section:
        with BuildLine():
            Line((0.771504896, 0), (-0.042410366, -0.770338345))
            Line((-0.042410366, -0.770338345), (-0.057404695, -0.769925907))
            ThreePointArc((-0.057404695, -0.769925907), (-0.02559692, -0.385048372), (-0.014994329, 0.000412438))
            Line((-0.014994329, 0.000412438), (0.000412438, 0.014994329))
            ThreePointArc((0.000412438, 0.014994329), (0.385873249, 0.004391737), (0.771917335, 0.014994329))
            Line((0.771917335, 0.014994329), (0.771504896, 0))
        make_face()
    fase1_piece_27a = extrude(amount=23.857524482, mode=Mode.PRIVATE)
    fase1_piece_27a = split(fase1_piece_27a, bisect_by=Plane(origin=(-49.25265478, 5.032763859, 7.317035106), z_dir=(0, -0.7071067811865476, 0.7071067811865475)), keep=Keep.TOP, mode=Mode.PRIVATE)
    with BuildSketch(Plane(origin=(-49.5, 0.13615914, 2.420430388), x_dir=(0.9996219169112968, 0.01944252080601436, -0.019442520806014357), z_dir=(0, 0.7071067811865475, 0.7071067811865476))) as fase1_piece_27b_section:
        with BuildLine():
            Line((0.771504896, 0), (-0.042410366, -0.770338345))
            Line((-0.042410366, -0.770338345), (-0.057404695, -0.769925907))
            ThreePointArc((-0.057404695, -0.769925907), (-0.02559692, -0.385048372), (-0.014994329, 0.000412438))
            Line((-0.014994329, 0.000412438), (0.000412438, 0.014994329))
            ThreePointArc((0.000412438, 0.014994329), (0.385873249, 0.004391737), (0.771917335, 0.014994329))
            Line((0.771917335, 0.014994329), (0.771504896, 0))
        make_face()
    fase1_piece_27b = extrude(amount=8.606261823, mode=Mode.PRIVATE)
    fase1_piece_27b = split(fase1_piece_27b, bisect_by=Plane(origin=(-49.25265478, 4.682964894, 7.317035106), z_dir=(0, 0.7071067811865438, 0.7071067811865513)), keep=Keep.TOP, mode=Mode.PRIVATE)
    fase1_piece_27 = fase1_piece_27a & fase1_piece_27b
    add(fase1_piece_27, mode=Mode.SUBTRACT)

    # Verrundung1
    verrundung1_edges = [part.edges().sort_by_distance(p)[0] for p in [
        (-29.5, 15.625, 0),
        (29.5, 15.625, 0),
    ]]
    fillet(verrundung1_edges, radius=VERRUNDUNG1_R)


solid = part.part
